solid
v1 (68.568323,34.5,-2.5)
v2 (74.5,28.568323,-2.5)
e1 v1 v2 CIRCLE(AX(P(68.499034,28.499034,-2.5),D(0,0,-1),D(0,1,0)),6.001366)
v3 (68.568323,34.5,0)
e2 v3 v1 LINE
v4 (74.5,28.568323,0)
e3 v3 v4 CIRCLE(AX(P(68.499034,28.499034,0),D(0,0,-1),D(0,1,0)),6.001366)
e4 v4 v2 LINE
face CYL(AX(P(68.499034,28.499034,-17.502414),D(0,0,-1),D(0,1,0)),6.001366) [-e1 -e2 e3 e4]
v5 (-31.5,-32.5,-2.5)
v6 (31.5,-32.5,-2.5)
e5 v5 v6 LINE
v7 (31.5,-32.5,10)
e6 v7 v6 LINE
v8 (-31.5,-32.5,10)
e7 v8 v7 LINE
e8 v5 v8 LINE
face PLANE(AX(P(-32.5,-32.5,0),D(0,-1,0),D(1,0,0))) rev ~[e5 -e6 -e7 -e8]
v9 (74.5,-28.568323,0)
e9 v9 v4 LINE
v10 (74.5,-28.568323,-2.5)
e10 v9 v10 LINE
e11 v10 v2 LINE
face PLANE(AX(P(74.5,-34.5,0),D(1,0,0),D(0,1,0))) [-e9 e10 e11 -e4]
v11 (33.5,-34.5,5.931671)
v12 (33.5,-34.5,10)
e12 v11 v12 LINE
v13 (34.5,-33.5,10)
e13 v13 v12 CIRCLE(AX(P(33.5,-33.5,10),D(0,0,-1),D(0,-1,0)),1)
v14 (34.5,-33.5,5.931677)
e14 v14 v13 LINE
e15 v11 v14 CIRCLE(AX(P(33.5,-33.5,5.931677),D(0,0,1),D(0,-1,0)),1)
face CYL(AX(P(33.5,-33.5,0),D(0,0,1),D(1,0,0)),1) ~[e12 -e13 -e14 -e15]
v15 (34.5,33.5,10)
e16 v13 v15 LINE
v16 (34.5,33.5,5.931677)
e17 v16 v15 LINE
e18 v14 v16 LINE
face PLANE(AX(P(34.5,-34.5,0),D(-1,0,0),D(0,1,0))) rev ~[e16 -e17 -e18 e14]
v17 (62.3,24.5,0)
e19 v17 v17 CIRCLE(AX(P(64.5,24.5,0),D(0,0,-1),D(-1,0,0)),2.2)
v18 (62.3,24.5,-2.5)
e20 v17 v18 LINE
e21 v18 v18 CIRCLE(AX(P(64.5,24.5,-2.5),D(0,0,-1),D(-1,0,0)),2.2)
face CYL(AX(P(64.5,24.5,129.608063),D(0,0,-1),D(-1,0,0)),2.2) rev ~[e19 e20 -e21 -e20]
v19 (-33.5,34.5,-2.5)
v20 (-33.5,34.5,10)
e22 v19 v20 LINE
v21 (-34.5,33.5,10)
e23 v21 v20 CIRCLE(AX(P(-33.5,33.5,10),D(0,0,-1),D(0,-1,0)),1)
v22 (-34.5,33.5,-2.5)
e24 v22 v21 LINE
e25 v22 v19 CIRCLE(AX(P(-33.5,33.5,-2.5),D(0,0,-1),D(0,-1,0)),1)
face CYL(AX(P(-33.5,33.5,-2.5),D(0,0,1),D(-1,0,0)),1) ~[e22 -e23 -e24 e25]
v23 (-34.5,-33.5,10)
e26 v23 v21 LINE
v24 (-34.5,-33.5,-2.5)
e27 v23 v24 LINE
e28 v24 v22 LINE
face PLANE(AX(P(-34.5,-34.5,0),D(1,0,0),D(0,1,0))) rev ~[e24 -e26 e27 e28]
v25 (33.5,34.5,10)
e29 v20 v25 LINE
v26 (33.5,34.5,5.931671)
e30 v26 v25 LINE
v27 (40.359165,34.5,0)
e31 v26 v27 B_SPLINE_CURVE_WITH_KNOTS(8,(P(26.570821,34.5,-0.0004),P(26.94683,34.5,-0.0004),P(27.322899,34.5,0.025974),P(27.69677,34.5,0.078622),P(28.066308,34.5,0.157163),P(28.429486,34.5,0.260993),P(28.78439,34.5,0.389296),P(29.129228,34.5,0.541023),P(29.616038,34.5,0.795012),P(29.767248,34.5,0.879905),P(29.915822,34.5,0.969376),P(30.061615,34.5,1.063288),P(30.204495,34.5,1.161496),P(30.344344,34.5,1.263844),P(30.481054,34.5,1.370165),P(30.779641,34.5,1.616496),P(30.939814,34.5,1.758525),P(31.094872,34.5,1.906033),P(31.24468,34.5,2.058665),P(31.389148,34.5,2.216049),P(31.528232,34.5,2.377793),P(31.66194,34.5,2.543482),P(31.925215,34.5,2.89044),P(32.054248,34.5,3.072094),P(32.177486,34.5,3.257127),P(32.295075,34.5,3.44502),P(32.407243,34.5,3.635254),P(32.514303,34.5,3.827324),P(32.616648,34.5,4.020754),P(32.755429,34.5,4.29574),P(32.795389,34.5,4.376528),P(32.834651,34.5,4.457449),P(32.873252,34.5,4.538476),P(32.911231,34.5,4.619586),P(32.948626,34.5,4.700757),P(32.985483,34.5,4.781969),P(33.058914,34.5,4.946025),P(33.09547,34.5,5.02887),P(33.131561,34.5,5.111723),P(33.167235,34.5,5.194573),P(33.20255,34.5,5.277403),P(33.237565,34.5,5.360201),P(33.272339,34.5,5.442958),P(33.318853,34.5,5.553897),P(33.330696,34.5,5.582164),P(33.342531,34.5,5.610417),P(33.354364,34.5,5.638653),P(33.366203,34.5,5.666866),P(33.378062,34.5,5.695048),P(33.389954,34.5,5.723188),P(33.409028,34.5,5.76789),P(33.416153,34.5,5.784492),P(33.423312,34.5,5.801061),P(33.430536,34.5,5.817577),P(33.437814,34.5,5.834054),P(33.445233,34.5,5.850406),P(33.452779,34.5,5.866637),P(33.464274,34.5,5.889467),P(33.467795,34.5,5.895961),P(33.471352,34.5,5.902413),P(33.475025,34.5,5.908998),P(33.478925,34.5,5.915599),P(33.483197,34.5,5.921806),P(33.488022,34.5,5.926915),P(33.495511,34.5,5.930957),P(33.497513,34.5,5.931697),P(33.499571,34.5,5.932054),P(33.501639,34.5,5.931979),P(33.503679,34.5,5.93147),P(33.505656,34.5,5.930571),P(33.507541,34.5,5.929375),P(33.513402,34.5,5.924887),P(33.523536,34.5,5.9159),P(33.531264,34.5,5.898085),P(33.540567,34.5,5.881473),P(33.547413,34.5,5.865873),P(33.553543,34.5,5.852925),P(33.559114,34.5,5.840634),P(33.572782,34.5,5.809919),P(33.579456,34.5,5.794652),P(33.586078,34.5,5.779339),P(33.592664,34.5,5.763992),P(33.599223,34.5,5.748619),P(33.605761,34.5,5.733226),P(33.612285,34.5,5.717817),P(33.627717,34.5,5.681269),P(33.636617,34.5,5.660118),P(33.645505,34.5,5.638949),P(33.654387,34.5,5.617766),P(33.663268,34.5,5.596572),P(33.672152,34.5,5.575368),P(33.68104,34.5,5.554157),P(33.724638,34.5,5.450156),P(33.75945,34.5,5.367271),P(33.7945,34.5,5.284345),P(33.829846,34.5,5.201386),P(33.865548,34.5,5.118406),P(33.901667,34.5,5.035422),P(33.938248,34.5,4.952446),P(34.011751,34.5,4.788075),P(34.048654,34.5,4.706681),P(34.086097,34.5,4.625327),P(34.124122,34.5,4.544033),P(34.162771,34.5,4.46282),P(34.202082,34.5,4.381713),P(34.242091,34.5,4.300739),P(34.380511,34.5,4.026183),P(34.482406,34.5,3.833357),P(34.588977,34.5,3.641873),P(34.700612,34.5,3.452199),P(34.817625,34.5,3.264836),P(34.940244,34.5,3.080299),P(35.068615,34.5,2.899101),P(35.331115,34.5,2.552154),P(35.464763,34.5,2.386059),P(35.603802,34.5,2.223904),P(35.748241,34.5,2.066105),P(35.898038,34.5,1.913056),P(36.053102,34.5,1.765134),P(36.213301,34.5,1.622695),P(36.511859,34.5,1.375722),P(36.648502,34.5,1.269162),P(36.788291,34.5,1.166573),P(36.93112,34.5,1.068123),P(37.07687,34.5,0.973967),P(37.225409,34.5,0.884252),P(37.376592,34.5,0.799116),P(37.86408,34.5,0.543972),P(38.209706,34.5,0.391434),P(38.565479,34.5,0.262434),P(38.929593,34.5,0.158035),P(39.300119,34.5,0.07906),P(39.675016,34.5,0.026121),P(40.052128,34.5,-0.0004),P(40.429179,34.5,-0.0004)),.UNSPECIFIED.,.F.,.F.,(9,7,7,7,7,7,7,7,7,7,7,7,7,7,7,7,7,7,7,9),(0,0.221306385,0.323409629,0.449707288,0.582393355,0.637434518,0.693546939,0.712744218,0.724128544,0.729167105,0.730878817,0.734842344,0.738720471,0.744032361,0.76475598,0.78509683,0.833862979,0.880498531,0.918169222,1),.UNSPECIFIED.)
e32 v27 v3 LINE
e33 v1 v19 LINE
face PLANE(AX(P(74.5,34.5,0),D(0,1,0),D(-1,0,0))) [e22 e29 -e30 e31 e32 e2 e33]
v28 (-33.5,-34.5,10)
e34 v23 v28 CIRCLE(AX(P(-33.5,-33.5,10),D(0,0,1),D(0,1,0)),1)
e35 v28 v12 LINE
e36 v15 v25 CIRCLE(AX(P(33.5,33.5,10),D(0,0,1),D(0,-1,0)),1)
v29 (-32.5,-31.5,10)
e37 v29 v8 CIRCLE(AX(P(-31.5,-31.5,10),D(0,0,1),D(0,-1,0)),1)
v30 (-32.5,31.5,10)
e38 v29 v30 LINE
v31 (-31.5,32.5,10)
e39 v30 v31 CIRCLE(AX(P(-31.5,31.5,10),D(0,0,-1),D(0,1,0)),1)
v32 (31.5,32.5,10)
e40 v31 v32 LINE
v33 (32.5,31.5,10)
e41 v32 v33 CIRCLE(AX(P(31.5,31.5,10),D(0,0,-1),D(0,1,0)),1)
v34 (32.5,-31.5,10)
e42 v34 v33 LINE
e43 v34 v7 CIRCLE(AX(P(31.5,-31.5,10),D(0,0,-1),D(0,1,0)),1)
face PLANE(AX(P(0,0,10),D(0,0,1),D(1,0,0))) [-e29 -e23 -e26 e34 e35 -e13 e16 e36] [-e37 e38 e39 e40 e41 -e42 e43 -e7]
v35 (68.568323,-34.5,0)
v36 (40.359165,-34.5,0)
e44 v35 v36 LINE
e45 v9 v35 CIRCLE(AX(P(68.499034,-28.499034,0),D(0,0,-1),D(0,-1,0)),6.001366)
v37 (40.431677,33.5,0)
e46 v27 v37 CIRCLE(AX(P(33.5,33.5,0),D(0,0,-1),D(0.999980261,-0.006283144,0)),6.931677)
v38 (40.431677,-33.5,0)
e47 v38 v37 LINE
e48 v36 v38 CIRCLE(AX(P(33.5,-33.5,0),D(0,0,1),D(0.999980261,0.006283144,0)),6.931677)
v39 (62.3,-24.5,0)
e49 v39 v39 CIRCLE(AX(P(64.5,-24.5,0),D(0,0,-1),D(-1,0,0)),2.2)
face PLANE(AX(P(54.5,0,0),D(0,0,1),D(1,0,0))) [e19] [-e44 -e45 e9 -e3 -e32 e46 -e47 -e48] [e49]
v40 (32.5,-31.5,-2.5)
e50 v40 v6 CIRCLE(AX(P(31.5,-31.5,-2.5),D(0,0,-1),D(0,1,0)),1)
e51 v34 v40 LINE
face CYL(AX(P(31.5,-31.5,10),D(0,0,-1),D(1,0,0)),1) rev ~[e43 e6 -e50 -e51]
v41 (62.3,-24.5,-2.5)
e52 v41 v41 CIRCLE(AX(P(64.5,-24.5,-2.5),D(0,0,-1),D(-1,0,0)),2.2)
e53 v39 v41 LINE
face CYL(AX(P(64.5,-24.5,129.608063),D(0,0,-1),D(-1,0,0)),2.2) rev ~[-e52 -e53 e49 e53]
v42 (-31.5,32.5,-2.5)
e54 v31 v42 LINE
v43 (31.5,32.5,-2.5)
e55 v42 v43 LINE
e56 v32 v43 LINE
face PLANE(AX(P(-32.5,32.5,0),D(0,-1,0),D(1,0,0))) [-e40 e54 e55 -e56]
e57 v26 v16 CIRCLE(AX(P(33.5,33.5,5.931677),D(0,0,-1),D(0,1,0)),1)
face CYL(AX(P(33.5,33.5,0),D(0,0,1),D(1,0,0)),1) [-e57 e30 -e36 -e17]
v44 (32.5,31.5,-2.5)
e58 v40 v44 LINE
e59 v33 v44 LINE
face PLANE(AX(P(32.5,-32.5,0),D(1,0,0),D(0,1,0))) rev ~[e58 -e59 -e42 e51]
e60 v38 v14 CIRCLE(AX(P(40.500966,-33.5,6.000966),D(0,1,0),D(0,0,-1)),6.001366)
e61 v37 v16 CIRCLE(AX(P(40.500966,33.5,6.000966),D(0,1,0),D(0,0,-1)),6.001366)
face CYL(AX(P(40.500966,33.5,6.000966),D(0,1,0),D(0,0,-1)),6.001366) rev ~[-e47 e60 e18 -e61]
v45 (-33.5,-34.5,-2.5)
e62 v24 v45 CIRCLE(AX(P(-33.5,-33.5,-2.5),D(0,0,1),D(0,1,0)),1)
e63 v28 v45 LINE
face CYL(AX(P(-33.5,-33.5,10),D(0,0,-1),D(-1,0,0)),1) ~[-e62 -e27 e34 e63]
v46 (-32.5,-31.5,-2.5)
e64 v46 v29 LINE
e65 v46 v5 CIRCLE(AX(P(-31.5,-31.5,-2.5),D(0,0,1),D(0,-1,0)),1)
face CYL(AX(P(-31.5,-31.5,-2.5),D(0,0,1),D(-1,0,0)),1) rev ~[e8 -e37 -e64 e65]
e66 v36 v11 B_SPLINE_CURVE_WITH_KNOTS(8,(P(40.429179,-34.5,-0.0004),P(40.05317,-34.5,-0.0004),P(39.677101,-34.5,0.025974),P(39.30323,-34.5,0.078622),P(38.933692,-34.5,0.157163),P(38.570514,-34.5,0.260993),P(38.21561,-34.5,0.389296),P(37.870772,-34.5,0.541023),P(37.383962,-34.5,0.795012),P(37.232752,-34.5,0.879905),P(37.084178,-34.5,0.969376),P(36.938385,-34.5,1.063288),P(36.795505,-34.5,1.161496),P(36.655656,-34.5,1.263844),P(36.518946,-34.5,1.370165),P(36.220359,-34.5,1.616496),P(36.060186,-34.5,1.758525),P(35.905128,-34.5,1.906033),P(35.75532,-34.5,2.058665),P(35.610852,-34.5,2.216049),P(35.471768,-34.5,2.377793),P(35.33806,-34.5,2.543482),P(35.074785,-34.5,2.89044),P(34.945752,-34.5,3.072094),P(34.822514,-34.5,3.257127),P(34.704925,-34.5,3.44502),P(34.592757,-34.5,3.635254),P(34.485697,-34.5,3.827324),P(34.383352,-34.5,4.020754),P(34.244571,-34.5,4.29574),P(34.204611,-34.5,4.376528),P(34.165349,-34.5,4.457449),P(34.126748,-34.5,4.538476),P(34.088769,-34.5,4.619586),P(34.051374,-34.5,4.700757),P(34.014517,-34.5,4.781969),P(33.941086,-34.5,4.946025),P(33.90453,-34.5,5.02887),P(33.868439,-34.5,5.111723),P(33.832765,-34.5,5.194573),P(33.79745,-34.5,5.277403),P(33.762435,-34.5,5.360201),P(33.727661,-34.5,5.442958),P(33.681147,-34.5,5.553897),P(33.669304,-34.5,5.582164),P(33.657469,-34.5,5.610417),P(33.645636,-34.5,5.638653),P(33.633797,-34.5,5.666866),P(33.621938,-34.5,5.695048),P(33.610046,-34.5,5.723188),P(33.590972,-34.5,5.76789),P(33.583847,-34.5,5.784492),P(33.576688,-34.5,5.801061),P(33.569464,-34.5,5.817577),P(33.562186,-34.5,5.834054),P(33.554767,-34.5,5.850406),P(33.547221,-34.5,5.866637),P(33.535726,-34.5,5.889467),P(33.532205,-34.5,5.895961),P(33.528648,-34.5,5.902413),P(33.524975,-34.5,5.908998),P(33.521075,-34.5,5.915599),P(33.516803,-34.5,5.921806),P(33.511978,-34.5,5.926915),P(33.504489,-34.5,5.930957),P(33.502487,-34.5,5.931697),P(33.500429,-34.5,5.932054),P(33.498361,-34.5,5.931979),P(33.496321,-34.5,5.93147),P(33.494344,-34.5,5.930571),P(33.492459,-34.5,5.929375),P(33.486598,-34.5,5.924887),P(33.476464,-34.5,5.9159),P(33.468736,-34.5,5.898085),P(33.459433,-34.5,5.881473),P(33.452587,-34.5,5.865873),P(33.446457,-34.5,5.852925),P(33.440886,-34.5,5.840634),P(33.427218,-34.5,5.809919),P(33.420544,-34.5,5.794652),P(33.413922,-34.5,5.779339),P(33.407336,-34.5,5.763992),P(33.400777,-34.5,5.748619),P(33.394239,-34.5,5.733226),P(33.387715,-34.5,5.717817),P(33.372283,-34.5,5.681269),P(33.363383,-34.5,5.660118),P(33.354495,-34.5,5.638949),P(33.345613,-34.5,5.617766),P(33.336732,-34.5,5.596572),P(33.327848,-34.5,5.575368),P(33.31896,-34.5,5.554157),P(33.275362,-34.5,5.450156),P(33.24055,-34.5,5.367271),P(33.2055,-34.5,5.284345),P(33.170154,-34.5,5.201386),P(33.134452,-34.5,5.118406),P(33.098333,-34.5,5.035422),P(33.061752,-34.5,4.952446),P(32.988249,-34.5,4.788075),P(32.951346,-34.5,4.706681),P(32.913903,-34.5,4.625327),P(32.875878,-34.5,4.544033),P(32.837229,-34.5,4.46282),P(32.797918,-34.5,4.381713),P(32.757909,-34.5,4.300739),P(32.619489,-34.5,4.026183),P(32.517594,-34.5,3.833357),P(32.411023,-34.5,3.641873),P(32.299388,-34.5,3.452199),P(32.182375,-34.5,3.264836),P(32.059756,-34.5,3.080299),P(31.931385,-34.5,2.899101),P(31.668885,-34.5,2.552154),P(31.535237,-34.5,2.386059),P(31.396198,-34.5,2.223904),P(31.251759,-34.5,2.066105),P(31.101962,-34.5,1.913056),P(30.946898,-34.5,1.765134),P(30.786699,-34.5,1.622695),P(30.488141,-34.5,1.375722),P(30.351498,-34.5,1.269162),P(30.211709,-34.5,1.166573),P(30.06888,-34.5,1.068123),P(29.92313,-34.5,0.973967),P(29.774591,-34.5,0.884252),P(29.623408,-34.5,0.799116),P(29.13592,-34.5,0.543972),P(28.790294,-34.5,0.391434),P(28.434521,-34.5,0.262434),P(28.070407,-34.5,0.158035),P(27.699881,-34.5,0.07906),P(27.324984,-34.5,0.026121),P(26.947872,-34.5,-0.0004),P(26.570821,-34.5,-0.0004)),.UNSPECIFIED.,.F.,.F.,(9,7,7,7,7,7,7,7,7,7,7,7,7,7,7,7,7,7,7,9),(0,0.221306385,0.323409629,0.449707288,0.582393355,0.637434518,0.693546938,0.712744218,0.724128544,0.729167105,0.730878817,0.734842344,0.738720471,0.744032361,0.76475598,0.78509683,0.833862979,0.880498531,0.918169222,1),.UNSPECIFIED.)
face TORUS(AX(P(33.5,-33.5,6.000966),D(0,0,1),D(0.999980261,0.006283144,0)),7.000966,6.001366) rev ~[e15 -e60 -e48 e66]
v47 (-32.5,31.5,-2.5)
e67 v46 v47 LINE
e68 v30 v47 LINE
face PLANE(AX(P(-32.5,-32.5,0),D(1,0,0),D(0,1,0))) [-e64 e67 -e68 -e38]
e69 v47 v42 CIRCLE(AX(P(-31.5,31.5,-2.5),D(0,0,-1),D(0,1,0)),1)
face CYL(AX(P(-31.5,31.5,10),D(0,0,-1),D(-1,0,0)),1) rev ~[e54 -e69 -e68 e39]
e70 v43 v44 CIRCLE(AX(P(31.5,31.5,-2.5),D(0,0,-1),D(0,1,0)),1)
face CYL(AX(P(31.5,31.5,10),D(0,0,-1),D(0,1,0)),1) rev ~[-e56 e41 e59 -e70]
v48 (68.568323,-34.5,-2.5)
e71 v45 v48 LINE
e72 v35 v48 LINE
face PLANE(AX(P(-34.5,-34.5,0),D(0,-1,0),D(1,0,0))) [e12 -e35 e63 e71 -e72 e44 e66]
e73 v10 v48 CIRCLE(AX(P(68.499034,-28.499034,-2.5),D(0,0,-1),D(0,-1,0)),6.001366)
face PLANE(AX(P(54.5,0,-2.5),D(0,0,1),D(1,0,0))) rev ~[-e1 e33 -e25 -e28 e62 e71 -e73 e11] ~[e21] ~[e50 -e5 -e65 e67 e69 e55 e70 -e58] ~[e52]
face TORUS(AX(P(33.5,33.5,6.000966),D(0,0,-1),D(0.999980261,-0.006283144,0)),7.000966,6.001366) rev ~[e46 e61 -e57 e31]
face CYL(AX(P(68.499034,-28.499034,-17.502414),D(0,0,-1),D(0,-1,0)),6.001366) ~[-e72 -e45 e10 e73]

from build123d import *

# Parameters (mm, degrees)
F0_W         = 69
F0_H         = 69
F0_W_2       = 65
F0_H_2       = 65
F1_DEPTH     = 10
F0_W_3       = 40
F2_DEPTH     = 2.5
F3_R         = 1
F4_T1_DEPTH  = 67
F4_T6_ANGLE  = 359.64
F4_T12_ANGLE = 359.64
F4_T15_DEPTH = 32.5048284938
F5_D         = 4.4


# Not quite as in the source:
# - a fillet or chamfer that OpenCascade refuses, or shapes differently, is made with other operations: its cross-section is extruded or revolved along the edge and cut away or added


with BuildPart() as f1:
    # F0 (on Top) → F1 (new body)
    with BuildSketch(Plane.XY):
        Rectangle(F0_W, F0_H)
        Rectangle(F0_W_2, F0_H_2, mode=Mode.SUBTRACT)
    extrude(amount=F1_DEPTH)

    # F0 (on Top) → F2 (join)
    with BuildSketch(Plane.XY):
        with Locations((54.5, 0)):
            Rectangle(F0_W_3, F0_H)
        Rectangle(F0_W, F0_H)
        Rectangle(F0_W_2, F0_H_2, mode=Mode.SUBTRACT)
    extrude(amount=-F2_DEPTH)

    # F3
    f3_edges = [f1.edges().sort_by_distance(p)[0] for p in [
        (32.5, 32.5, 3.75),
        (-32.5, 32.5, 3.75),
        (-32.5, -32.5, 3.75),
        (32.5, -32.5, 3.75),
        (-34.5, 34.5, 3.75),
        (-34.5, -34.5, 3.75),
        (34.5, 34.5, 5),
        (34.5, -34.5, 5),
    ]]
    fillet(f3_edges, radius=F3_R)

    # F4: fillet of radius 6 on 3 edges, made by hand

    # F4_s2 → F4_t1 (join)
    with BuildSketch(Plane.XZ.offset(-33.5)):
        with BuildLine():
            ThreePointArc((40.5009656854, -0.0004), (36.2573593129, 1.7573593129), (34.4996, 6.0009656854))
            Line((34.4996, 6.0009656854), (33.8994634315, 6.0009656854))
            ThreePointArc((33.8994634315, 6.0009656854), (33.8998634315, 3.0004828427), (33.8998634315, 0))
            Line((33.8998634315, 0), (34.5, -0.6001365685))
            ThreePointArc((34.5, -0.6001365685), (37.5004828427, -0.6001365685), (40.5009656854, -0.6005365685))
            Line((40.5009656854, -0.6005365685), (40.5009656854, -0.0004))
        make_face()
    extrude(amount=F4_T1_DEPTH)


with BuildPart() as f4_tool4:
    # F4_s5 → F4_t6 (revolve)
    with BuildSketch(Plane(origin=(0.2118036776, -33.7091586585, 0), x_dir=(0, 0, 1), z_dir=(0.006283144, -0.9999802609, 0))):
        with BuildLine():
            ThreePointArc((6.0009656854, -34.2884534158), (1.7573593129, -36.0462127287), (-0.0004, -40.2898191013))
            Line((-0.0004, -40.2898191013), (-0.6005365685, -40.2898191013))
            ThreePointArc((-0.6005365685, -40.2898191013), (-0.6001365685, -37.2893362585), (-0.6001365685, -34.2888534158))
            Line((-0.6001365685, -34.2888534158), (0, -33.6887168473))
            ThreePointArc((0, -33.6887168473), (3.0004828427, -33.6887168473), (6.0009656854, -33.6883168473))
            Line((6.0009656854, -33.6883168473), (6.0009656854, -34.2884534158))
        make_face()
    revolve(axis=Axis((33.5, -33.5, 0), (0, 0, 1)), revolution_arc=F4_T6_ANGLE)

    split(bisect_by=Plane.XZ.offset(34.5), keep=Keep.BOTTOM)

    split(bisect_by=Plane.YZ.offset(32.5), keep=Keep.TOP)


with BuildPart() as f1_1:
    add(f1.part)

    # F4_t3: union F4_tool4
    add(f4_tool4.part)


with BuildPart() as f4_tool10:
    # F4_s11 → F4_t12 (revolve)
    with BuildSketch(Plane(origin=(0.2118036776, 33.7091586585, 0), x_dir=(0, 0, 1), z_dir=(0.006283144, 0.9999802609, 0))):
        with BuildLine():
            ThreePointArc((-0.0004, 40.2898191013), (1.7573593129, 36.0462127287), (6.0009656854, 34.2884534158))
            Line((6.0009656854, 34.2884534158), (6.0009656854, 33.6883168473))
            ThreePointArc((6.0009656854, 33.6883168473), (3.0004828427, 33.6887168473), (0, 33.6887168473))
            Line((0, 33.6887168473), (-0.6001365685, 34.2888534158))
            ThreePointArc((-0.6001365685, 34.2888534158), (-0.6001365685, 37.2893362585), (-0.6005365685, 40.2898191013))
            Line((-0.6005365685, 40.2898191013), (-0.0004, 40.2898191013))
        make_face()
    revolve(axis=Axis((33.5, 33.5, 0), (0, 0, -1)), revolution_arc=F4_T12_ANGLE)

    split(bisect_by=Plane.XZ.offset(-34.5), keep=Keep.TOP)

    split(bisect_by=Plane.YZ.offset(32.5), keep=Keep.TOP)


with BuildPart() as f1_2:
    add(f1_1.part)

    # F4_t9: union F4_tool10
    add(f4_tool10.part)

    # F4_s16 → F4_t15 (cut)
    with BuildSketch(Plane.XY.offset(-17.5024142469)):
        with BuildLine():
            ThreePointArc((68.4990343146, 34.5004), (72.7426406871, 32.7426406871), (74.5004, 28.4990343146))
            Line((74.5004, 28.4990343146), (75.1005365685, 28.4990343146))
            ThreePointArc((75.1005365685, 28.4990343146), (75.1001365685, 31.4995171573), (75.1001365685, 34.5))
            Line((75.1001365685, 34.5), (74.5, 35.1001365685))
            ThreePointArc((74.5, 35.1001365685), (71.4995171573, 35.1001365685), (68.4990343146, 35.1005365685))
            Line((68.4990343146, 35.1005365685), (68.4990343146, 34.5004))
        make_face()
        with BuildLine():
            ThreePointArc((68.4990343146, -34.5004), (72.7426406871, -32.7426406871), (74.5004, -28.4990343146))
            Line((74.5004, -28.4990343146), (75.1005365685, -28.4990343146))
            ThreePointArc((75.1005365685, -28.4990343146), (75.1001365685, -31.4995171573), (75.1001365685, -34.5))
            Line((75.1001365685, -34.5), (74.5, -35.1001365685))
            ThreePointArc((74.5, -35.1001365685), (71.4995171573, -35.1001365685), (68.4990343146, -35.1005365685))
            Line((68.4990343146, -35.1005365685), (68.4990343146, -34.5004))
        make_face()
    extrude(amount=F4_T15_DEPTH, mode=Mode.SUBTRACT)

    # F5 (through all)
    with Locations(Plane.XY):
        with Locations((64.5, -24.5), (64.5, 24.5)):
            Hole(F5_D / 2)


solid = f1_2.part
